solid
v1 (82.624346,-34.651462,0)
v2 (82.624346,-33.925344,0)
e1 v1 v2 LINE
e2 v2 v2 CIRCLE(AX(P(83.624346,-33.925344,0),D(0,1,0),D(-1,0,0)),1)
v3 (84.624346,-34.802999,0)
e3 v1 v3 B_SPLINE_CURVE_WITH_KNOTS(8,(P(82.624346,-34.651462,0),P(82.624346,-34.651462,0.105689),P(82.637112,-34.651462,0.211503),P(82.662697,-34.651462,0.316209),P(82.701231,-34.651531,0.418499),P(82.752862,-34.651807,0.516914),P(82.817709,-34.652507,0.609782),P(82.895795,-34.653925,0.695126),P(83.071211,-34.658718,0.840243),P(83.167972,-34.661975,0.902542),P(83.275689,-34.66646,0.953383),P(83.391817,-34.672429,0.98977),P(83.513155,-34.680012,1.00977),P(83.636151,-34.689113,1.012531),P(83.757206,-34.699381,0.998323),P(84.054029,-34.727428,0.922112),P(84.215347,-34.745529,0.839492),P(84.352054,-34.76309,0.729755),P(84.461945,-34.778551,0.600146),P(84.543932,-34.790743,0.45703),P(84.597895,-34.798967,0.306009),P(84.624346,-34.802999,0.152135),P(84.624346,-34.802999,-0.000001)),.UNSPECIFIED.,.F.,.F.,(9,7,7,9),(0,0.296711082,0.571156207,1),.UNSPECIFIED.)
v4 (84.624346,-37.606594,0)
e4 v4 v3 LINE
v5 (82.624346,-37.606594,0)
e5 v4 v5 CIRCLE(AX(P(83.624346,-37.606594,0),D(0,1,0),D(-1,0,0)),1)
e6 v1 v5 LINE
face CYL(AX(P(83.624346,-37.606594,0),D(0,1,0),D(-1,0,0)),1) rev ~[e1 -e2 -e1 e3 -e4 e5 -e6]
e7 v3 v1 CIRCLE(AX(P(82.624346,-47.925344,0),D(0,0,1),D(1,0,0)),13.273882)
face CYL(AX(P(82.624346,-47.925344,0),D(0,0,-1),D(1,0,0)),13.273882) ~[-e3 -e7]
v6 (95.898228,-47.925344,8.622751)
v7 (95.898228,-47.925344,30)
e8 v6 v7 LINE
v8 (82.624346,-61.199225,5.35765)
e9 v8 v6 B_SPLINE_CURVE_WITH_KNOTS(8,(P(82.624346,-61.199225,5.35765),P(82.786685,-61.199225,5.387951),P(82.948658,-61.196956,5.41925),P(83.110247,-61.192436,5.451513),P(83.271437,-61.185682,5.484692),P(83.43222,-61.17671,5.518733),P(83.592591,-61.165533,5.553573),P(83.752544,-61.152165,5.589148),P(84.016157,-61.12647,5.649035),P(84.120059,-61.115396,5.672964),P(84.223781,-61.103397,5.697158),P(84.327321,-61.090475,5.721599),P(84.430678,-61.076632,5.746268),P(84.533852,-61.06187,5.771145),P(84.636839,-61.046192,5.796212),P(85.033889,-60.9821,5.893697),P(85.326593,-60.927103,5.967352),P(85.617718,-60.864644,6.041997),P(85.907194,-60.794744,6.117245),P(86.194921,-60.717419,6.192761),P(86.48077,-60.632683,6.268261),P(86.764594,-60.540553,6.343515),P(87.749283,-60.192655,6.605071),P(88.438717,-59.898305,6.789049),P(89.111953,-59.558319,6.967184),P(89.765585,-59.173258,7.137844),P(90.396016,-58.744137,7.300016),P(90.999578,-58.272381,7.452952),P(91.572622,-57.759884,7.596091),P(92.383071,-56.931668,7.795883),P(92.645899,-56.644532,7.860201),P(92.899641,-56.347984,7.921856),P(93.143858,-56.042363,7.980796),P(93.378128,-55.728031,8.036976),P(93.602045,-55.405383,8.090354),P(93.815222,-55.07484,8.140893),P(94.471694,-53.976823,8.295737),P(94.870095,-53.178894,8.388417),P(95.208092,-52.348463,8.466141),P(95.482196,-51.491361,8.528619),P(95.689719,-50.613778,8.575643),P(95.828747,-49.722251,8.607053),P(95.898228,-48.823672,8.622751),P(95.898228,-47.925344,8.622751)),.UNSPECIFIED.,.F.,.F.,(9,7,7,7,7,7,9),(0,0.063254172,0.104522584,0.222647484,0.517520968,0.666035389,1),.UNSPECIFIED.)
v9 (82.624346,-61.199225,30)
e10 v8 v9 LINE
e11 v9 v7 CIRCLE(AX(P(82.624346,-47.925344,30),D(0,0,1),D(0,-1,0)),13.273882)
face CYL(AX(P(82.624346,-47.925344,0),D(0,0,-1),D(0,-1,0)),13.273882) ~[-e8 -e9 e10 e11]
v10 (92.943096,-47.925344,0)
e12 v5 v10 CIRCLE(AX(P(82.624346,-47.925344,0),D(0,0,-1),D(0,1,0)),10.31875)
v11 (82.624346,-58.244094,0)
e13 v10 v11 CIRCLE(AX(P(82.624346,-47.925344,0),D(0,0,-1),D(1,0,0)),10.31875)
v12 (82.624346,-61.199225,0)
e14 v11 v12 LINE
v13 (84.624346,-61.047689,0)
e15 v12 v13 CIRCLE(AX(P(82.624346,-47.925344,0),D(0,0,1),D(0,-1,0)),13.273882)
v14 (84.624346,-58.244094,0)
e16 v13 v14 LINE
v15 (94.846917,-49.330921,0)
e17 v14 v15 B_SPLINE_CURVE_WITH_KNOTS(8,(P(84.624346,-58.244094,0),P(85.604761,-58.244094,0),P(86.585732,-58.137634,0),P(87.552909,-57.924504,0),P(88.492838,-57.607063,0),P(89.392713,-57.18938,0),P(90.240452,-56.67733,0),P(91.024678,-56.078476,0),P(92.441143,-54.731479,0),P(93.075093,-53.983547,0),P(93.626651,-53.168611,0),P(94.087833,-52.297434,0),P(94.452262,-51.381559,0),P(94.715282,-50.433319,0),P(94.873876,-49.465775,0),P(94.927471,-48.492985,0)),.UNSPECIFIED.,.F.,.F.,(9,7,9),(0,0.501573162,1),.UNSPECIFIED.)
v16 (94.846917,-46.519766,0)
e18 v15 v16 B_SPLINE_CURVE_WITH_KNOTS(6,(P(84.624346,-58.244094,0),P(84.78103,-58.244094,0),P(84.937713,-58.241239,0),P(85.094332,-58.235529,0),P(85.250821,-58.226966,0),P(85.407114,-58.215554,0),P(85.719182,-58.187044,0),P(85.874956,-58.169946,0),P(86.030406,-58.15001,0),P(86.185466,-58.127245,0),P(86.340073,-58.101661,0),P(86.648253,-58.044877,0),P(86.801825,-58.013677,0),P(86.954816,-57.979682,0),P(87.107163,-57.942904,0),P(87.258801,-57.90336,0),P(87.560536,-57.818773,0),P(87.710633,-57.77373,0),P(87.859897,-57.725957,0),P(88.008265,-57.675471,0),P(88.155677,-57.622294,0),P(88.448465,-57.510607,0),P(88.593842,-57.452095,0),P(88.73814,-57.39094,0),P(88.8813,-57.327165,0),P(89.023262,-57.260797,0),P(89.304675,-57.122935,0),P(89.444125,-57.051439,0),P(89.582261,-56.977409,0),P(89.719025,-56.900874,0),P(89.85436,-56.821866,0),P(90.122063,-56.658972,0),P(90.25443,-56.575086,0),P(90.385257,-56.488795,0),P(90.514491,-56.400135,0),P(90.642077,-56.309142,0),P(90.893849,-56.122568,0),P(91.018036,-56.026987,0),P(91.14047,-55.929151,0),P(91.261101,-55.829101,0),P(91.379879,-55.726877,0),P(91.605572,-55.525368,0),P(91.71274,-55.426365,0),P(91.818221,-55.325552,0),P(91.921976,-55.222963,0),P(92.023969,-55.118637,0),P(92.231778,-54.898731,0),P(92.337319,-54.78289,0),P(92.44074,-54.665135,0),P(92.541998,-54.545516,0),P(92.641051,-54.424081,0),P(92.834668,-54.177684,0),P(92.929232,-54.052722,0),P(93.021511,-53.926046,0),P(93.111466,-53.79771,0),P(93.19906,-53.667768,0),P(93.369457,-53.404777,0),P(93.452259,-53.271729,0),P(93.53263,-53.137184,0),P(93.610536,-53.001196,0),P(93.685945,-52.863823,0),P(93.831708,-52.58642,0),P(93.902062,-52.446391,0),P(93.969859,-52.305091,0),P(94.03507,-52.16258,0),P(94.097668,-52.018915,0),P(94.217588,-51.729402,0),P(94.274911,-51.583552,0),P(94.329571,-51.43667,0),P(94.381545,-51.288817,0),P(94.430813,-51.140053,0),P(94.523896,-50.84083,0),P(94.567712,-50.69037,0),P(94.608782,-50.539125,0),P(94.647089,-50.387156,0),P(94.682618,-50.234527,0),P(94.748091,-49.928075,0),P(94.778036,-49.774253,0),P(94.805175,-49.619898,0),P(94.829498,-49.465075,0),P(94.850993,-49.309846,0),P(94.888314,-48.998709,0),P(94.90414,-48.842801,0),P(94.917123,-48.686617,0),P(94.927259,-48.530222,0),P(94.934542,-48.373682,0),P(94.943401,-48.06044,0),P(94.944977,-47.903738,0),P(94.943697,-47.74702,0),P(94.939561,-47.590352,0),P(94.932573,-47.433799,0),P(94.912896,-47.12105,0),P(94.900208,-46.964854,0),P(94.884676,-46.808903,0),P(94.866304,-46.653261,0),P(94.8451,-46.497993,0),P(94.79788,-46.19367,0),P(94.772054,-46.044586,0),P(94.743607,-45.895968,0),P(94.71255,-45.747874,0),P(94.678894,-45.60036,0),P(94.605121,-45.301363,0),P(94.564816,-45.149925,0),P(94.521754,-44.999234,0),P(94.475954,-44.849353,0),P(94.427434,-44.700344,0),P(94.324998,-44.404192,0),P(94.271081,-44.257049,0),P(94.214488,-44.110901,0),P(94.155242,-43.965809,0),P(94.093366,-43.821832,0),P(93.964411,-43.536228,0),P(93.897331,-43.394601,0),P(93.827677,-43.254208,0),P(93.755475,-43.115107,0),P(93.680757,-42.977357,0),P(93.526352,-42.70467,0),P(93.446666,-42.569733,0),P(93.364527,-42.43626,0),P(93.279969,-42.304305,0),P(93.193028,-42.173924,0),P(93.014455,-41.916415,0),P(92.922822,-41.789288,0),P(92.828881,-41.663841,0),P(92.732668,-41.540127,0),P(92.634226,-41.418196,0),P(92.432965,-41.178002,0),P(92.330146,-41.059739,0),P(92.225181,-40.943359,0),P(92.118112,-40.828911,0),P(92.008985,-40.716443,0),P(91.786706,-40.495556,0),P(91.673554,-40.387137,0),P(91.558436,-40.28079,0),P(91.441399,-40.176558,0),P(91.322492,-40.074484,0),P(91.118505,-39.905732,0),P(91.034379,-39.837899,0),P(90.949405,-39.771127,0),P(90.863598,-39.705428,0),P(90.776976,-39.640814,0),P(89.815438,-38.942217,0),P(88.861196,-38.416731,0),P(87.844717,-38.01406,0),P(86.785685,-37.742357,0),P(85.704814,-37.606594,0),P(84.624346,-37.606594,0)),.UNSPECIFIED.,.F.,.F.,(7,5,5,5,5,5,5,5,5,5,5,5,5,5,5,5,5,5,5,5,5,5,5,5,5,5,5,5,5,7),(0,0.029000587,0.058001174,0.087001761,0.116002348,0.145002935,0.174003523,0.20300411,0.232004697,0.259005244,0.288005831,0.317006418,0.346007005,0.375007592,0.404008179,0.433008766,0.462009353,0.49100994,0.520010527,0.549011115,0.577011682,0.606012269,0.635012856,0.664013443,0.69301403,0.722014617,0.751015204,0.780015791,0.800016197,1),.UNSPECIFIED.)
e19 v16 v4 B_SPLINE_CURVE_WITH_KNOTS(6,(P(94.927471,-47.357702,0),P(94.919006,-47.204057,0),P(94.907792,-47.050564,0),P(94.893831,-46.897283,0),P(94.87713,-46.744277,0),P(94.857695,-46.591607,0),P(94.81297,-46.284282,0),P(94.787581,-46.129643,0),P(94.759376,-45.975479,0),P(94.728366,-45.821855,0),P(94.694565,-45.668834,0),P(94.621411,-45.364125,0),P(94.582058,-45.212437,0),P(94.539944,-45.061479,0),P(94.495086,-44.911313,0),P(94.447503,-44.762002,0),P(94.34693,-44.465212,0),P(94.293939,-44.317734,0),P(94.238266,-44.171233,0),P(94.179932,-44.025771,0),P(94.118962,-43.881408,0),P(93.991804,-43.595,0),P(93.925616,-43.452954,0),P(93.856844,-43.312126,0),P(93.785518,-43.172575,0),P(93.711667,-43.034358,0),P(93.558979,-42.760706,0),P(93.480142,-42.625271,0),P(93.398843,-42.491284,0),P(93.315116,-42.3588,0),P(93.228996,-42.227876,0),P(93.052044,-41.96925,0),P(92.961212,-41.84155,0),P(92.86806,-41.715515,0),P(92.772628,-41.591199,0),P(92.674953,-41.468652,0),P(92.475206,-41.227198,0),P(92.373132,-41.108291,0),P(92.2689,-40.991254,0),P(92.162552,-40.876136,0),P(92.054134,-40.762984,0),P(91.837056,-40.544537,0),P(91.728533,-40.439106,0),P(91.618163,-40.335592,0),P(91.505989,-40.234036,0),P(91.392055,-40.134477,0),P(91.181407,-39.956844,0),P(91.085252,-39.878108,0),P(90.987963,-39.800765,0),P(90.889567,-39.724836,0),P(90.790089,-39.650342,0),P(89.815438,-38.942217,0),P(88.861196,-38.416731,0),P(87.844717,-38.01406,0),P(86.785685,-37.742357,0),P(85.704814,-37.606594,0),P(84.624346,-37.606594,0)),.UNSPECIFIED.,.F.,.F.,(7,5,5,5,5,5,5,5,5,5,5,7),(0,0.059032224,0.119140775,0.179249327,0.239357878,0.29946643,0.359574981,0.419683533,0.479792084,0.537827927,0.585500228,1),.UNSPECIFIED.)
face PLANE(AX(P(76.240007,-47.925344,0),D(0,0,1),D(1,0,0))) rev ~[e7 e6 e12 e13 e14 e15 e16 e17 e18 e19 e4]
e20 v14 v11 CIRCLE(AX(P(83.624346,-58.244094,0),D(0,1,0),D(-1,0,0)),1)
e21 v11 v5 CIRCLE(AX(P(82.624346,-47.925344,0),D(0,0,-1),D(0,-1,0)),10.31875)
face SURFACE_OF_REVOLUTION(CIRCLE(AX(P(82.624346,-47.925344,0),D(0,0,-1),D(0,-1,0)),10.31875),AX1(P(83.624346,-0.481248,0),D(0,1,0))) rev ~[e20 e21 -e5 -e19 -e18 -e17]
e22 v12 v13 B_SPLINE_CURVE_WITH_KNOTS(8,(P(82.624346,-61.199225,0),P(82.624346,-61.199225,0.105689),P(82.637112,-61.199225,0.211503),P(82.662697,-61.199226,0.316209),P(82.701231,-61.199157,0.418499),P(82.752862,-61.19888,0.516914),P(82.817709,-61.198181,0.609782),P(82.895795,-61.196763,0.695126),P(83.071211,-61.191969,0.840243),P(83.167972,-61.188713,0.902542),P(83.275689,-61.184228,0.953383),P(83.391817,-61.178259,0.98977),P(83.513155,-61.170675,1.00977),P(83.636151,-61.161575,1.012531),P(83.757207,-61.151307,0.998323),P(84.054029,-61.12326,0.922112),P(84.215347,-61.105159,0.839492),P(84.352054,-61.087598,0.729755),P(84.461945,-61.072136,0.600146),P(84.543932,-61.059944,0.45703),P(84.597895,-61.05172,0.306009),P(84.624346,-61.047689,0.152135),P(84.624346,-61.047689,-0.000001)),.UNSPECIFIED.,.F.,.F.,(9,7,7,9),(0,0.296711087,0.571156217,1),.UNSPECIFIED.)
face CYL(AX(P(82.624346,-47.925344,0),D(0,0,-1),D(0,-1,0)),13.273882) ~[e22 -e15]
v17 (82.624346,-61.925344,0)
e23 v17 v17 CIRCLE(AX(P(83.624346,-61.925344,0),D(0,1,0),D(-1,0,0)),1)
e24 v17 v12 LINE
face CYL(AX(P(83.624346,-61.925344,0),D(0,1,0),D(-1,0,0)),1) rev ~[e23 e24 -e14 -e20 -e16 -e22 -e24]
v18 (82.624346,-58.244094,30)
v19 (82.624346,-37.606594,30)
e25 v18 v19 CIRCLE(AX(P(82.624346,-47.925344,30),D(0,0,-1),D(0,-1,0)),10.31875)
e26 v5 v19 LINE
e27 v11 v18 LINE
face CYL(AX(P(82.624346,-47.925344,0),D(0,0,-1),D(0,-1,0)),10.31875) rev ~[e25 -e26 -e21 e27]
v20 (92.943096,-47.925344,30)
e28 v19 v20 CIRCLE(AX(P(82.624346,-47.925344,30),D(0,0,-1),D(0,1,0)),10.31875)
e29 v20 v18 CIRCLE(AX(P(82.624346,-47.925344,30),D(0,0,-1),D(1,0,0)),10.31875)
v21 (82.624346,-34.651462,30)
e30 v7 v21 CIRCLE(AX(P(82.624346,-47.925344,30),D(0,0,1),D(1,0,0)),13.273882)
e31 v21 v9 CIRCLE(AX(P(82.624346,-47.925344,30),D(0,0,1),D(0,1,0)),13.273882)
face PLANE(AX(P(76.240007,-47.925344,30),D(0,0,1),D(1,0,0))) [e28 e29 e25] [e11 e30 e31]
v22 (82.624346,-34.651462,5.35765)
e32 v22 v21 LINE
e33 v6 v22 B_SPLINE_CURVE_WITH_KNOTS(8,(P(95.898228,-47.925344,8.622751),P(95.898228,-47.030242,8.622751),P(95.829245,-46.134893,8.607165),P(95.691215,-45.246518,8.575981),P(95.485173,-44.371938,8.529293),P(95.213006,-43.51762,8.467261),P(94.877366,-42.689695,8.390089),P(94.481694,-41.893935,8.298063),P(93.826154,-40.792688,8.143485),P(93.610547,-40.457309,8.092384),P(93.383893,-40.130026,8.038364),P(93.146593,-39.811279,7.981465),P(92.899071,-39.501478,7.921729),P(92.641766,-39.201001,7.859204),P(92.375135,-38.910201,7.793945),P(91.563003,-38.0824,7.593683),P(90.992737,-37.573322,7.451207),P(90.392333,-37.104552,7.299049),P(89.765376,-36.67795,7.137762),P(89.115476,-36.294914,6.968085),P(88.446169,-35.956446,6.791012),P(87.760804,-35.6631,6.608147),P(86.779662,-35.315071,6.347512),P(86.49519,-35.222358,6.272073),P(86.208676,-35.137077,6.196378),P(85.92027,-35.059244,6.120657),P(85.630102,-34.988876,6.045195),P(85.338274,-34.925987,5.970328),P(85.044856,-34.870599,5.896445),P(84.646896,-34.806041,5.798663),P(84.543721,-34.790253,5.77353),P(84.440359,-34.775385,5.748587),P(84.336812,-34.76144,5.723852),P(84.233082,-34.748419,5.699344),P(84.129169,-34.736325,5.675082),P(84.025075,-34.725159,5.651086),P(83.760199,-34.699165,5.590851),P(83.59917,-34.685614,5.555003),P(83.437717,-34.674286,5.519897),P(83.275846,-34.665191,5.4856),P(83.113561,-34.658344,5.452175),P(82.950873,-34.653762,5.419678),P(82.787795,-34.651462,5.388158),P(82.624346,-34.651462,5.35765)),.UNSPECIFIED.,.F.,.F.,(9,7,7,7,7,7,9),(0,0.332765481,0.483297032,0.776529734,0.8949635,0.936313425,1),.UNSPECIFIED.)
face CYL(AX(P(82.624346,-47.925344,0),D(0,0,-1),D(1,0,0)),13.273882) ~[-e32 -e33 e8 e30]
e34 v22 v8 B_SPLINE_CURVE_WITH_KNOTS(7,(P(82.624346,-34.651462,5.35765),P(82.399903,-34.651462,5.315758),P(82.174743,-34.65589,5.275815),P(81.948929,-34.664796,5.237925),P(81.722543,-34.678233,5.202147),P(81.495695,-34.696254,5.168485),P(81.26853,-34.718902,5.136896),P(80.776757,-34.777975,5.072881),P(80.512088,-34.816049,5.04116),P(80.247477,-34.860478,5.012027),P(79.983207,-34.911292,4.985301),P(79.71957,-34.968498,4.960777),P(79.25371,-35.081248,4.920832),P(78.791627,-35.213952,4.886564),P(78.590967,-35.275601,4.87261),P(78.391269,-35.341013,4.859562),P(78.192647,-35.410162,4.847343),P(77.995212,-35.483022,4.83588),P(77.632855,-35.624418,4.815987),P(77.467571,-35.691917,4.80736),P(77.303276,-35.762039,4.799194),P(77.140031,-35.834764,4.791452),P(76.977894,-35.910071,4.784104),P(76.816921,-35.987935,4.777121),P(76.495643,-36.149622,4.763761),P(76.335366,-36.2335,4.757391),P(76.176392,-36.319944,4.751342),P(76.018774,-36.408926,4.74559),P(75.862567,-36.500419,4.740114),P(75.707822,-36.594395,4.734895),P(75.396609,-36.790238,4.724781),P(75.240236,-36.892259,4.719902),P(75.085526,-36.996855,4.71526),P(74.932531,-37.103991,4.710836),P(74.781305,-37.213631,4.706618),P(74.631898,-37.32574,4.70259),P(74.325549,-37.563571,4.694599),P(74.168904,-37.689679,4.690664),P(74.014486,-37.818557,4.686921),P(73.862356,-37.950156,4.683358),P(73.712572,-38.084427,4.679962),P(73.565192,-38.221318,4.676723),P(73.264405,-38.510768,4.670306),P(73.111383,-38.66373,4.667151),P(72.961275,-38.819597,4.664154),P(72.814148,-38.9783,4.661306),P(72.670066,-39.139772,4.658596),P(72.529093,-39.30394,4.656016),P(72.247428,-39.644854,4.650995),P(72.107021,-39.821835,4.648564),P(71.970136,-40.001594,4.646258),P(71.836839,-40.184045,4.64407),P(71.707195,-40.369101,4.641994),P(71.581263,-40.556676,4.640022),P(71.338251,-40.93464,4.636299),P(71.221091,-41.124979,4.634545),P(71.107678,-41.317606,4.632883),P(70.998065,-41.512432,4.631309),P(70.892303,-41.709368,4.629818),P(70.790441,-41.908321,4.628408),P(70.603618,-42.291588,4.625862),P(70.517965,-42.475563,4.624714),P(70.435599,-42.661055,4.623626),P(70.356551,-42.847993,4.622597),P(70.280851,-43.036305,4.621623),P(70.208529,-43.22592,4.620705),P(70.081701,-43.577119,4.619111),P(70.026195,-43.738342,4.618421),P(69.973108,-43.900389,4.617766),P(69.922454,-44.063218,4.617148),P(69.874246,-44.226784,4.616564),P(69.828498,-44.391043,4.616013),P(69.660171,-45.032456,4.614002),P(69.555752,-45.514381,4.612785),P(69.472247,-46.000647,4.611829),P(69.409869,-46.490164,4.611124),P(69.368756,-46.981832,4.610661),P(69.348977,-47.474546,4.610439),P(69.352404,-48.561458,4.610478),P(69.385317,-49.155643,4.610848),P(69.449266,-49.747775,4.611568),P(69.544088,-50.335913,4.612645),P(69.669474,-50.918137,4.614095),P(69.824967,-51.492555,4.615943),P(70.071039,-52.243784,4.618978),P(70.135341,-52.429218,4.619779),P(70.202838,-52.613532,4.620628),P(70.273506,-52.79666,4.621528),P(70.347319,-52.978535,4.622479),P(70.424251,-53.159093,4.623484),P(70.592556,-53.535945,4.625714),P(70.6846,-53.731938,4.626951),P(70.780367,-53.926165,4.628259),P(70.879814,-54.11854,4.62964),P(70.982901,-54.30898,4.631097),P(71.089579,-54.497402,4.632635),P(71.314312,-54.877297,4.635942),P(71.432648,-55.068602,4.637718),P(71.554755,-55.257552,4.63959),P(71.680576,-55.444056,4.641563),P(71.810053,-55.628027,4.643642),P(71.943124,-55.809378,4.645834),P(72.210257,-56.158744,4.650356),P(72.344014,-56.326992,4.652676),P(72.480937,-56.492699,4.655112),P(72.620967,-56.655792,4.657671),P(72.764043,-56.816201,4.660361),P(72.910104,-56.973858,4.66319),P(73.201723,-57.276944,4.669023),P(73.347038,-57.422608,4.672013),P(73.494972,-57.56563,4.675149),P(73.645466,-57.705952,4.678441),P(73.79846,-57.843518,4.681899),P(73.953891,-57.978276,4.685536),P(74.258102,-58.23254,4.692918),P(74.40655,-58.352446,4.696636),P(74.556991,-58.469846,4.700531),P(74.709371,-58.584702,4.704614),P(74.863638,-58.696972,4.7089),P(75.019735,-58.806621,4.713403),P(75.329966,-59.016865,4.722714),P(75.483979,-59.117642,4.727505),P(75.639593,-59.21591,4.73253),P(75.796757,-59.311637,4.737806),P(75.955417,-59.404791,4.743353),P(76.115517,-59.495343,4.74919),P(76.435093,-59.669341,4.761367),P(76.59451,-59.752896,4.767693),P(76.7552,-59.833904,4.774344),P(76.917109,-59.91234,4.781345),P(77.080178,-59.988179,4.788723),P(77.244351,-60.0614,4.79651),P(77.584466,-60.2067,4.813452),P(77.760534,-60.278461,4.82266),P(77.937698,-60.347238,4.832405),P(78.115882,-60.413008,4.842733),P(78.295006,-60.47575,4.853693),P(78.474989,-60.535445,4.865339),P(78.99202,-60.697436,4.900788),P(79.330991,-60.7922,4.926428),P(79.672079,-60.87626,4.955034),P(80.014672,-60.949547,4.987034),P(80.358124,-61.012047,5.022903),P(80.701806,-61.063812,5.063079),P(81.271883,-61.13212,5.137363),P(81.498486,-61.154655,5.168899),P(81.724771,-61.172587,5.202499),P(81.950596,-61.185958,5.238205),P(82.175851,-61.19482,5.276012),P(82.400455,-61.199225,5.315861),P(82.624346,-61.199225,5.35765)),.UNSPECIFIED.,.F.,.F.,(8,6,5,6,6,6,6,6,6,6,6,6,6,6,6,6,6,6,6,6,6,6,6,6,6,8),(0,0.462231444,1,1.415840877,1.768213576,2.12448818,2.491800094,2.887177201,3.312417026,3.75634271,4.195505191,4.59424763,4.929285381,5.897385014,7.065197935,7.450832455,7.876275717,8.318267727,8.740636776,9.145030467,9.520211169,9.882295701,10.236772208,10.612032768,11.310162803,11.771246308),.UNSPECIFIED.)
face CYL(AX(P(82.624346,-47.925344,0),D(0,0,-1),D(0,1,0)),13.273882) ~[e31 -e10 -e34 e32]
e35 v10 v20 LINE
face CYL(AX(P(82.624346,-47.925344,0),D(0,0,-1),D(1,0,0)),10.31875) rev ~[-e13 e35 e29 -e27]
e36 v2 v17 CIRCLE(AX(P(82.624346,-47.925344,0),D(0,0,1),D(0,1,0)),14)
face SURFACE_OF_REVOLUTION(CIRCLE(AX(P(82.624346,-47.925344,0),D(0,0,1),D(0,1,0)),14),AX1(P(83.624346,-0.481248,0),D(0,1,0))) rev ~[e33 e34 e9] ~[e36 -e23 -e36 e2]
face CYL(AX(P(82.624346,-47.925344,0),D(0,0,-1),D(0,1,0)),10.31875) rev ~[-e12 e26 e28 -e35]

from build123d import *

# Parameters (mm, degrees)
F2_D     = 24.60625
F2_DEPTH = 90
F2_TIP   = 7.3924633035
F3_DEPTH = 30


# Not quite as in the source:
# - a length typed as a fraction of an inch, garbled in the dataset ("3 / 203.2 mm" for 3/8 in), is restored


with BuildPart() as f1:
    # F0 (on Top) → F1 (revolve)
    with BuildSketch(Plane.XY):
        with BuildLine():
            ThreePointArc((82.6243460178, -33.9253438014), (68.6243460178, -47.9253438014), (82.6243460178, -61.9253438014))
            Line((82.6243460178, -61.9253438014), (82.6243460178, -61.1992254835))
            ThreePointArc((82.6243460178, -61.1992254835), (69.3504643358, -47.9253438014), (82.6243460178, -34.6514621193))
            Line((82.6243460178, -34.6514621193), (82.6243460178, -33.9253438014))
        make_face()
        with BuildLine():
            ThreePointArc((82.6243460178, -34.6514621193), (69.3504643358, -47.9253438014), (82.6243460178, -61.1992254835))
            Line((82.6243460178, -61.1992254835), (82.6243460178, -58.2440938014))
            ThreePointArc((82.6243460178, -58.2440938014), (72.3055960178, -47.9253438014), (82.6243460178, -37.6065938014))
            Line((82.6243460178, -37.6065938014), (82.6243460178, -34.6514621193))
        make_face()
    revolve(axis=Axis((83.6243460178, -0.4812479019, 0), (0, 1, 0)))

    # F2 (one way)
    with BuildSketch(Plane(origin=(0, 0, 0), x_dir=(1, 0, 0), z_dir=(0, 0, -1))):
        with Locations((82.6243460178, 47.9253438014)):
            Circle(F2_D / 2)
    extrude(amount=-F2_DEPTH, mode=Mode.SUBTRACT)
    with Locations(Plane(origin=(0, 0, 0), x_dir=(1, 0, 0), z_dir=(0, 0, -1))):
        with Locations((82.6243460178, 47.9253438014)):
            with Locations((0, 0, -(F2_DEPTH + F2_TIP / 2))):  # 118° drill point
                Cone(0, F2_D / 2, F2_TIP, mode=Mode.SUBTRACT)

    # F0 (on Top) → F3 (join)
    with BuildSketch(Plane.XY):
        with BuildLine():
            ThreePointArc((82.6243460178, -34.6514621193), (69.3504643358, -47.9253438014), (82.6243460178, -61.1992254835))
            Line((82.6243460178, -61.1992254835), (82.6243460178, -58.2440938014))
            ThreePointArc((82.6243460178, -58.2440938014), (72.3055960178, -47.9253438014), (82.6243460178, -37.6065938014))
            Line((82.6243460178, -37.6065938014), (82.6243460178, -34.6514621193))
        make_face()
        with BuildLine():
            Line((82.6243460178, -58.2440938014), (82.6243460178, -61.1992254835))
            ThreePointArc((82.6243460178, -61.1992254835), (92.0103977679, -57.3113955515), (95.8982276999, -47.9253438014))
            ThreePointArc((95.8982276999, -47.9253438014), (92.0103977679, -38.5392920513), (82.6243460178, -34.6514621193))
            Line((82.6243460178, -34.6514621193), (82.6243460178, -37.6065938014))
            ThreePointArc((82.6243460178, -37.6065938014), (89.9208041162, -40.628885703), (92.9430960178, -47.9253438014))
            ThreePointArc((92.9430960178, -47.9253438014), (89.9208041162, -55.2218018998), (82.6243460178, -58.2440938014))
        make_face()
    extrude(amount=F3_DEPTH)


solid = f1.part
